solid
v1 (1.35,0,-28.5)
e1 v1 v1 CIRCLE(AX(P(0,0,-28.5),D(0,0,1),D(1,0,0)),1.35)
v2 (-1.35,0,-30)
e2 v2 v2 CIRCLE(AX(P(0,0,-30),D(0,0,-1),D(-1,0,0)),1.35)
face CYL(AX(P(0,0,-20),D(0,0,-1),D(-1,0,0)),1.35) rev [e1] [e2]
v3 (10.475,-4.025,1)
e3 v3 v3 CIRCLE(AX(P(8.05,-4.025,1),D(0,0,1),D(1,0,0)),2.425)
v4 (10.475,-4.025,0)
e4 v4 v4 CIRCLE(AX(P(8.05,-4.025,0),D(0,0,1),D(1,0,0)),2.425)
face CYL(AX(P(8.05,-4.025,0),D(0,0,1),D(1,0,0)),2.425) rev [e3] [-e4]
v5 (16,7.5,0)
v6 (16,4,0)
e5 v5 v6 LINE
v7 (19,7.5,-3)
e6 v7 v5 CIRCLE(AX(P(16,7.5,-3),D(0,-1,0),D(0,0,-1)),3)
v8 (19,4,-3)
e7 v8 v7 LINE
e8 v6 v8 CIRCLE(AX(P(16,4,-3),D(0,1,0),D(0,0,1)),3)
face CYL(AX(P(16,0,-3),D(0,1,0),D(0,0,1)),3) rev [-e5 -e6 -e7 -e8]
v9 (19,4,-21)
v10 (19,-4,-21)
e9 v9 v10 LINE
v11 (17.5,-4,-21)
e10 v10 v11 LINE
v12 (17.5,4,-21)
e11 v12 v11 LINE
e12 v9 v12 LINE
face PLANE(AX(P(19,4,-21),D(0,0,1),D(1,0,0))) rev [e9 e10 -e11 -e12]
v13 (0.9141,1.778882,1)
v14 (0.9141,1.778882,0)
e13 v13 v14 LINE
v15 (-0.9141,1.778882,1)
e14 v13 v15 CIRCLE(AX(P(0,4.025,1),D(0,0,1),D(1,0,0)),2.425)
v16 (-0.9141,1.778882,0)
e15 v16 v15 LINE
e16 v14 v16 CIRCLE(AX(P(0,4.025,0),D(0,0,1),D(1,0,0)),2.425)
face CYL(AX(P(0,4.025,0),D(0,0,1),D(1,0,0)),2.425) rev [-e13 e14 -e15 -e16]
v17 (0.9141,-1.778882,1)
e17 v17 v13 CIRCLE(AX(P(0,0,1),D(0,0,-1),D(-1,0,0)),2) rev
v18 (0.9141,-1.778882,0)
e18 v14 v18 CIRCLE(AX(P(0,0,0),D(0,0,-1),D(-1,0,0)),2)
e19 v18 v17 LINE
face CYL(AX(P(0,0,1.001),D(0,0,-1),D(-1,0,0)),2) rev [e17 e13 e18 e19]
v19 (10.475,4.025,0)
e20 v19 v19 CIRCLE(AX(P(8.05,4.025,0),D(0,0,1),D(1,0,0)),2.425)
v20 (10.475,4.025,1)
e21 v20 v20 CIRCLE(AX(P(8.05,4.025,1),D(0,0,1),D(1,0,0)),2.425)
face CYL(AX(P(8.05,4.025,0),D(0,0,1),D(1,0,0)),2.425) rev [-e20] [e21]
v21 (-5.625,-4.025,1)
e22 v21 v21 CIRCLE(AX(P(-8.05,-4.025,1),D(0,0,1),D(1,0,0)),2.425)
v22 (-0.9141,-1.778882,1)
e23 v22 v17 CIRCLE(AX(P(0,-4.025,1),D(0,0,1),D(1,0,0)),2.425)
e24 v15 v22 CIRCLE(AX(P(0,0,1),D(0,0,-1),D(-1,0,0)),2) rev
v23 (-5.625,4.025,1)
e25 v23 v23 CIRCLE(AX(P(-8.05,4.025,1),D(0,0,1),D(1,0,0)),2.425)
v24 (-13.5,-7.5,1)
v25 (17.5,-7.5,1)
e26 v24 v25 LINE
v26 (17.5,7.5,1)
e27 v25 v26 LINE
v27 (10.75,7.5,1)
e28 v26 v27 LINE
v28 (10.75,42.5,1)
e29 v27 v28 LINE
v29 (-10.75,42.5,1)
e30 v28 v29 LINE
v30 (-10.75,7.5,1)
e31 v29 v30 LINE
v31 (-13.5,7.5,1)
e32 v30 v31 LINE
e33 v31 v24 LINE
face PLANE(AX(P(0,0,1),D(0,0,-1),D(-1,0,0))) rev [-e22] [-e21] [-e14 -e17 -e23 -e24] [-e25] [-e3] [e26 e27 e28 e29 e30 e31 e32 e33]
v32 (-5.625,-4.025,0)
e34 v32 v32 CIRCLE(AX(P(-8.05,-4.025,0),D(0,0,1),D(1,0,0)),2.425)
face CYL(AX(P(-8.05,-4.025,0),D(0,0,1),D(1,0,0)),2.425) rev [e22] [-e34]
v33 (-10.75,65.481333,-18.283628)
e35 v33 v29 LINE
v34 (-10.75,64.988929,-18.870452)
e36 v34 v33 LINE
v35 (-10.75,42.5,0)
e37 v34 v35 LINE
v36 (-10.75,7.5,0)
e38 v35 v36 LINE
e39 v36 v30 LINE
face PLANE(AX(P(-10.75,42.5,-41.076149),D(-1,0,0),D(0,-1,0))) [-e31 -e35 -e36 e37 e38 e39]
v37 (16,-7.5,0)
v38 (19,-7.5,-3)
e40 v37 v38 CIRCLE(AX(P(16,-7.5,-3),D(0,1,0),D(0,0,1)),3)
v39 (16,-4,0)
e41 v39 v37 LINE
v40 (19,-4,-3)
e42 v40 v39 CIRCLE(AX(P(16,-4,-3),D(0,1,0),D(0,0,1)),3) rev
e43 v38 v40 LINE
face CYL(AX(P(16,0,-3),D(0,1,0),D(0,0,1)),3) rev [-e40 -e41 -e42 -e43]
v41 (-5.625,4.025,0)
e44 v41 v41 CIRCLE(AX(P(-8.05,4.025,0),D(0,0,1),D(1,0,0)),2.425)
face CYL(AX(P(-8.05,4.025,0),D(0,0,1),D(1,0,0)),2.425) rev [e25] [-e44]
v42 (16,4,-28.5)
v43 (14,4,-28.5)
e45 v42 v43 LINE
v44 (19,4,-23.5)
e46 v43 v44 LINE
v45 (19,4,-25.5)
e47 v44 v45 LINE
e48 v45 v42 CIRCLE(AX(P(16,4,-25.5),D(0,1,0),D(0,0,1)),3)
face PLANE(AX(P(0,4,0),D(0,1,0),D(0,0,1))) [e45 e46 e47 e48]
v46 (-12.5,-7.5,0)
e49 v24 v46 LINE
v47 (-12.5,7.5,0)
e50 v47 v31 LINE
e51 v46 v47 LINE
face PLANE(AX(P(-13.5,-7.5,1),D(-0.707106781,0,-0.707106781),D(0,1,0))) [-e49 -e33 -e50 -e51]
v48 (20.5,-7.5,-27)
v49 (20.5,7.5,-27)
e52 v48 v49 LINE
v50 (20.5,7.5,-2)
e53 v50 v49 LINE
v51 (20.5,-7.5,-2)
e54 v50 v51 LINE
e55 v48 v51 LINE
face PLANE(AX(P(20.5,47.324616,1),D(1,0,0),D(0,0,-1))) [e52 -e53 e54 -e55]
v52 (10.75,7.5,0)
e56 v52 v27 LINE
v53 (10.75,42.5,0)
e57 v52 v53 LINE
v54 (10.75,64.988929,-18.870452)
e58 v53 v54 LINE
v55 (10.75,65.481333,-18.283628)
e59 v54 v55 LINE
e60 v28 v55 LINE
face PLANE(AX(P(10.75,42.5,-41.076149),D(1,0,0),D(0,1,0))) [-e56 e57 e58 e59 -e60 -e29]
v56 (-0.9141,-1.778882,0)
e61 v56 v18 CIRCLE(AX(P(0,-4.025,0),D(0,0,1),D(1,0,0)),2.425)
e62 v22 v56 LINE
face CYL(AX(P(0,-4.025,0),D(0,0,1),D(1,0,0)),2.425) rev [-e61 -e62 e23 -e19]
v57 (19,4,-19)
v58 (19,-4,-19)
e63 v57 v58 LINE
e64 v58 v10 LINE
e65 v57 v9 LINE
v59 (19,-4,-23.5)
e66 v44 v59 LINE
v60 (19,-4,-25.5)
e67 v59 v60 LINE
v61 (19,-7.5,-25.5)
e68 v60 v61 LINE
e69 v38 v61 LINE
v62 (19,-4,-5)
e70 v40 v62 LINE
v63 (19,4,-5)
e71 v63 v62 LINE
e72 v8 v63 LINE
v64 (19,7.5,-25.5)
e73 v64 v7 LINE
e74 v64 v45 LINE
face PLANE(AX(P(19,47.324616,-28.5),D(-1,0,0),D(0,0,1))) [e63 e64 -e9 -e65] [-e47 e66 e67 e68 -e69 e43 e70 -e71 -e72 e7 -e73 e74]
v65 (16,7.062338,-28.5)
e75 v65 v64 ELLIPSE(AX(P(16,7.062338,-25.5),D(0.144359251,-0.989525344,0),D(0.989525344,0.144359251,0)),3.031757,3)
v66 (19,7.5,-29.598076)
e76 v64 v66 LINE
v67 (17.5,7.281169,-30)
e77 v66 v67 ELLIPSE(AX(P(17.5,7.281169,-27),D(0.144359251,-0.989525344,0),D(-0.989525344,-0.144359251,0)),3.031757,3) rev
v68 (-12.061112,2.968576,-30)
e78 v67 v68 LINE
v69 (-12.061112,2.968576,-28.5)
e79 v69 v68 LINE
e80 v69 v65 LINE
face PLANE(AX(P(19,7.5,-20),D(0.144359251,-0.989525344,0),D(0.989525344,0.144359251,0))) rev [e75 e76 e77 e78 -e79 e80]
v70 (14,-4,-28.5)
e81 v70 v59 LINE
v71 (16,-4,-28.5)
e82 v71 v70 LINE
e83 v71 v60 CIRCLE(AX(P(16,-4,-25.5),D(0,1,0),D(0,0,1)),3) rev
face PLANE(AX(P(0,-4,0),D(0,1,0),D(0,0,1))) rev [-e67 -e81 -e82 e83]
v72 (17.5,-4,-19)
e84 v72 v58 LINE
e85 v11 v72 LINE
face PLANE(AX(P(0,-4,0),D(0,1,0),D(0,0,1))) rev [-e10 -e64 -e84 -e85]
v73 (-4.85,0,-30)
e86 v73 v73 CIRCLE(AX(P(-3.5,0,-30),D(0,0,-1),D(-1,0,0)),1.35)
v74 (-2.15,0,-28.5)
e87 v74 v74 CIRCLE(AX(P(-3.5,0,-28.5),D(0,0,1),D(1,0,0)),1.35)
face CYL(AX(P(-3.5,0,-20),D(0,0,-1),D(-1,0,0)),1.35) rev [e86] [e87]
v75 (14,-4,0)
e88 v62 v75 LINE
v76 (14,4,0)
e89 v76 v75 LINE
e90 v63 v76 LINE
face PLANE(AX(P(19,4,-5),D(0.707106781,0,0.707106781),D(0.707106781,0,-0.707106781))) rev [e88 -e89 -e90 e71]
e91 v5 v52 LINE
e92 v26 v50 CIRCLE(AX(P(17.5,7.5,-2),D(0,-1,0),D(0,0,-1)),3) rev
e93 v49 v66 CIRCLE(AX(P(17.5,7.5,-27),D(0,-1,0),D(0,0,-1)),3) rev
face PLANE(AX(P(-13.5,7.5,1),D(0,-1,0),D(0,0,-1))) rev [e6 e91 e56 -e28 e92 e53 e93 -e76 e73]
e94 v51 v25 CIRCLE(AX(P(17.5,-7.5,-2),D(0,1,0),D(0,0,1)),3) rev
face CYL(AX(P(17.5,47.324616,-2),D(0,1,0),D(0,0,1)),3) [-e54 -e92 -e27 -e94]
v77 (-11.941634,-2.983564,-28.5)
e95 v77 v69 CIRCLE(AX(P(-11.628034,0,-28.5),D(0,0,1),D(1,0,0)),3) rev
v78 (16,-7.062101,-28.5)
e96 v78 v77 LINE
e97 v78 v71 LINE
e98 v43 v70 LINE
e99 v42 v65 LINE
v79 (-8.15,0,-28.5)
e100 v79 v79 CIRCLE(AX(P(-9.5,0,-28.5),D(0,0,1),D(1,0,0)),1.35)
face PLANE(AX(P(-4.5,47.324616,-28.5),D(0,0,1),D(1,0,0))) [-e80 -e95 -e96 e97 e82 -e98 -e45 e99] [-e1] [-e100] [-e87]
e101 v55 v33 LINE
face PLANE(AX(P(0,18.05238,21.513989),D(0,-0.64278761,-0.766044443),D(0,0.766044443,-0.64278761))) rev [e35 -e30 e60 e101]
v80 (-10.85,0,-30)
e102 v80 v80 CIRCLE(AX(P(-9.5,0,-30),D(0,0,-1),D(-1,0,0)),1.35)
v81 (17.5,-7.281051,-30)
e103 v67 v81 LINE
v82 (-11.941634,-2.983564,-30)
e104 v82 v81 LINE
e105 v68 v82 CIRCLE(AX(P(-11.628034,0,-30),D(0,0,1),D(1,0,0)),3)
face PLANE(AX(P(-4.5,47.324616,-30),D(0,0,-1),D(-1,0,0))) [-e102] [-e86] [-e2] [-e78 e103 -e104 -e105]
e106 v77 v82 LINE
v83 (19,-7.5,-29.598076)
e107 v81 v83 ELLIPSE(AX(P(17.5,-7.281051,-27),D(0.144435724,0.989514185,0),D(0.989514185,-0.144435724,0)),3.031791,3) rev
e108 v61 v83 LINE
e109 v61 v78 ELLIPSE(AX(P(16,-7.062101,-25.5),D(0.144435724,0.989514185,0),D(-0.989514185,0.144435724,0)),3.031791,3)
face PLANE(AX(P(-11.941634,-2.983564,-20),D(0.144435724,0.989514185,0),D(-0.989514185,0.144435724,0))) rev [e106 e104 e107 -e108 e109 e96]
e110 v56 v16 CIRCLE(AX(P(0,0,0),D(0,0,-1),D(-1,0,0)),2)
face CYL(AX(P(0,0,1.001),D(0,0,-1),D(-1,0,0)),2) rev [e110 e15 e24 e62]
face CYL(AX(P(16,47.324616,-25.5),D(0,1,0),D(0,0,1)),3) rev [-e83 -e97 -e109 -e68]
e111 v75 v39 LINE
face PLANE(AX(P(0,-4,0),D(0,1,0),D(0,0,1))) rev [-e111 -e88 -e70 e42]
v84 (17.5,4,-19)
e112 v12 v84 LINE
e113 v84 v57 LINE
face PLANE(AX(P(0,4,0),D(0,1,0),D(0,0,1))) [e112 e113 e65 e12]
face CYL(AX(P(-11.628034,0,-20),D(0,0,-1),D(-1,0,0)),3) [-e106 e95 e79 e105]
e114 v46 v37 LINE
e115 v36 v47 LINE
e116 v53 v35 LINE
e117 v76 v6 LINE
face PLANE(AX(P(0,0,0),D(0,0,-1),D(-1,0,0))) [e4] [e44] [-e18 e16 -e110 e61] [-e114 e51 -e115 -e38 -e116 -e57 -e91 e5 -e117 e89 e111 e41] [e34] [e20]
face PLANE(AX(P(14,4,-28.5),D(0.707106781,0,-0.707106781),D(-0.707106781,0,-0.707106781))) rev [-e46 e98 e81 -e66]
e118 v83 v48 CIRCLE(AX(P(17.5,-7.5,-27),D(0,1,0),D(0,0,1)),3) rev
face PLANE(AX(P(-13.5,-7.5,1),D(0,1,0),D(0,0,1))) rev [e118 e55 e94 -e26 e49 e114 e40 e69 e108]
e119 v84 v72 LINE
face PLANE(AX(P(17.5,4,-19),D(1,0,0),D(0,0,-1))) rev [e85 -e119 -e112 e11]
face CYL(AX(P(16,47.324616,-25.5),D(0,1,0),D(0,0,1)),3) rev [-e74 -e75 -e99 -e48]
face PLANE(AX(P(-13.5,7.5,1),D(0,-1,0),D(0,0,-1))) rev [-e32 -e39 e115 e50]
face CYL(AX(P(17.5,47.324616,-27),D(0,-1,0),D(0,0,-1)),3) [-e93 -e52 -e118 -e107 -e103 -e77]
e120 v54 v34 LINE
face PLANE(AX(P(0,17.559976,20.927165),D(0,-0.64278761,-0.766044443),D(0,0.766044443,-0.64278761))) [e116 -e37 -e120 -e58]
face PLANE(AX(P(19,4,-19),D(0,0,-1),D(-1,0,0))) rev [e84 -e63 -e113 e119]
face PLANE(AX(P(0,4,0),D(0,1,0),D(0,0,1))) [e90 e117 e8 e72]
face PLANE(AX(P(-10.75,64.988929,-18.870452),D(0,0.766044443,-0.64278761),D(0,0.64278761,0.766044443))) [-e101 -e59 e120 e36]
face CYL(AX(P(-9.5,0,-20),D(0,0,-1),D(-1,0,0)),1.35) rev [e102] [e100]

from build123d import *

# Parameters (mm, degrees)
SKETCH_1_W          = 27
SKETCH_1_H          = 15
EXTRUDE_1_DEPTH     = 1
SKETCH_2_R          = 2.425
CUT_EXTRUDE_1_DEPTH = 16.475787541
EXTRUDE_2_DEPTH     = 15
SKETCH_6_W          = 1.5
SKETCH_6_H          = 2
EXTRUDE_3_DEPTH     = 4
CHAMFER_1_SIZE      = 1
CUT_EXTRUDE_4_REACH = 39.101
SKETCH_8_R          = 2
SKETCH_9_W          = 21.5
SKETCH_9_H          = 35
EXTRUDE_4_DEPTH     = 1
SKETCH_7_R          = 1.35
CUT_EXTRUDE_5_DEPTH = 10
SKETCH_12_W         = 12.5
SKETCH_12_H         = 15
EXTRUDE_5_DEPTH     = 1.5
SKETCH_13_R         = 1.35
CUT_EXTRUDE_6_DEPTH = 10
CUT_EXTRUDE_7_DEPTH = 10
FILLET_1_R          = 3
SKETCH_16_W         = 21.5
SKETCH_16_H         = 30
EXTRUDE_6_DEPTH     = 0.766044


with BuildPart() as part:
    # 草图1 → 凸台-拉伸1 (new body)
    with BuildSketch(Plane.XY):
        Rectangle(SKETCH_1_W, SKETCH_1_H)
    extrude(amount=EXTRUDE_1_DEPTH)

    # 草图2 → 切除-拉伸1 (cut, through all)
    with BuildSketch(Plane.XY.offset(1)):
        with Locations((0, 4.025)):
            Circle(SKETCH_2_R)
        with Locations((0, -4.025)):
            Circle(SKETCH_2_R)
        with Locations((8.05, 4.025)):
            Circle(SKETCH_2_R)
        with Locations((8.05, -4.025)):
            Circle(SKETCH_2_R)
        with Locations((-8.05, 4.025)):
            Circle(SKETCH_2_R)
        with Locations((-8.05, -4.025)):
            Circle(SKETCH_2_R)
    extrude(amount=-CUT_EXTRUDE_1_DEPTH, mode=Mode.SUBTRACT)

    # 草图3 → 凸台-拉伸2 (add)
    with BuildSketch(Plane.XZ.offset(7.5)):
        Polygon((13.5, 0), (19, 0), (19, -28.5), (-4.5, -28.5), (-4.5, -30), (20.5, -30), (20.5, 1), (13.5, 1), align=None)
    extrude(amount=-EXTRUDE_2_DEPTH)

    # 草图6 → 凸台-拉伸3 (add, symmetric)
    with BuildSketch(Plane(origin=(0, 0, 0), x_dir=(1, 0, 0), z_dir=(0, 1, 0))):
        Polygon((19, 0), (19, 5), (14, 0), align=None)
        Polygon((19, 28.5), (14, 28.5), (19, 23.5), align=None)
        with Locations((18.25, 20)):
            Rectangle(SKETCH_6_W, SKETCH_6_H)
    extrude(amount=EXTRUDE_3_DEPTH, both=True)

    # 倒角1
    chamfer_1_edges = [part.edges().sort_by_distance(p)[0] for p in [
        (-13.5, 0, 0),
    ]]
    chamfer(chamfer_1_edges, length=CHAMFER_1_SIZE - 0.0001)  # a hair under: the kernel refuses the full size

    # 草图8 → 切除-拉伸4 (cut, up to next)
    with BuildSketch(Plane(origin=(0, 0, 0), x_dir=(-1, 0, 0), z_dir=(0, 0, -1)), mode=Mode.PRIVATE) as cut_extrude_4_sk1:
        Circle(SKETCH_8_R)
    cut_extrude_4_tool1 = extrude(cut_extrude_4_sk1.sketch, amount=-CUT_EXTRUDE_4_REACH, mode=Mode.PRIVATE) & part.part
    add(cut_extrude_4_tool1.solids().sort_by_distance((0, 0, 0))[0], mode=Mode.SUBTRACT)

    # 草图9 → 凸台-拉伸4 (add)
    with BuildSketch(Plane.XY.offset(1)):
        with Locations((0, 25)):
            Rectangle(SKETCH_9_W, SKETCH_9_H)
    extrude(amount=-EXTRUDE_4_DEPTH)

    # 草图7 → 切除-拉伸5 (cut)
    with BuildSketch(Plane(origin=(0, 0, -30), x_dir=(-1, 0, 0), z_dir=(0, 0, -1))):
        Circle(SKETCH_7_R)
    extrude(amount=-CUT_EXTRUDE_5_DEPTH, mode=Mode.SUBTRACT)

    # 草图12 → 凸台-拉伸5 (add)
    with BuildSketch(Plane(origin=(0, 0, -30), x_dir=(-1, 0, 0), z_dir=(0, 0, -1))):
        with Locations((10.75, 0)):
            Rectangle(SKETCH_12_W, SKETCH_12_H)
    extrude(amount=-EXTRUDE_5_DEPTH)

    # 草图13 → 切除-拉伸6 (cut)
    with BuildSketch(Plane(origin=(0, 0, -30), x_dir=(-1, 0, 0), z_dir=(0, 0, -1))):
        with Locations((3.5, 0)):
            Circle(SKETCH_13_R)
        with Locations((9.5, 0)):
            Circle(SKETCH_13_R)
    extrude(amount=-CUT_EXTRUDE_6_DEPTH, mode=Mode.SUBTRACT)

    # 草图14 → 切除-拉伸7 (cut)
    with BuildSketch(Plane(origin=(0, 0, -30), x_dir=(-1, 0, 0), z_dir=(0, 0, -1))):
        with BuildLine():
            Line((-19, 7.5), (12.061111893, 2.968576032))
            ThreePointArc((12.061111893, 2.968576032), (14.627429927, -0.060207147), (11.941634037, -2.983564161))
            Line((11.941634037, -2.983564161), (-19, -7.5))
            Line((-19, -7.5), (17, -7.5))
            Line((17, -7.5), (17, 7.5))
            Line((17, 7.5), (-19, 7.5))
        make_face()
    extrude(amount=-CUT_EXTRUDE_7_DEPTH, mode=Mode.SUBTRACT)

    # 圆角1
    fillet_1_edges = [part.edges().sort_by_distance(p)[0] for p in [
        (20.5, 0, -30),
        (20.5, 0, 1),
        (19, 5.75, 0),
        (19, -5.75, 0),
        (19, 5.75, -28.5),
        (19, -5.75, -28.5),
    ]]
    fillet(fillet_1_edges, radius=FILLET_1_R)

    # 草图16 → 凸台-拉伸6 (add)
    with BuildSketch(Plane(origin=(0, 18.052380101, 21.51398884), x_dir=(-1, 0, 0), z_dir=(0, 0.6427876096865406, 0.7660444431189771))):
        with Locations((0, -46.914101223)):
            Rectangle(SKETCH_16_W, SKETCH_16_H)
    extrude(amount=-EXTRUDE_6_DEPTH)


solid = part.part
